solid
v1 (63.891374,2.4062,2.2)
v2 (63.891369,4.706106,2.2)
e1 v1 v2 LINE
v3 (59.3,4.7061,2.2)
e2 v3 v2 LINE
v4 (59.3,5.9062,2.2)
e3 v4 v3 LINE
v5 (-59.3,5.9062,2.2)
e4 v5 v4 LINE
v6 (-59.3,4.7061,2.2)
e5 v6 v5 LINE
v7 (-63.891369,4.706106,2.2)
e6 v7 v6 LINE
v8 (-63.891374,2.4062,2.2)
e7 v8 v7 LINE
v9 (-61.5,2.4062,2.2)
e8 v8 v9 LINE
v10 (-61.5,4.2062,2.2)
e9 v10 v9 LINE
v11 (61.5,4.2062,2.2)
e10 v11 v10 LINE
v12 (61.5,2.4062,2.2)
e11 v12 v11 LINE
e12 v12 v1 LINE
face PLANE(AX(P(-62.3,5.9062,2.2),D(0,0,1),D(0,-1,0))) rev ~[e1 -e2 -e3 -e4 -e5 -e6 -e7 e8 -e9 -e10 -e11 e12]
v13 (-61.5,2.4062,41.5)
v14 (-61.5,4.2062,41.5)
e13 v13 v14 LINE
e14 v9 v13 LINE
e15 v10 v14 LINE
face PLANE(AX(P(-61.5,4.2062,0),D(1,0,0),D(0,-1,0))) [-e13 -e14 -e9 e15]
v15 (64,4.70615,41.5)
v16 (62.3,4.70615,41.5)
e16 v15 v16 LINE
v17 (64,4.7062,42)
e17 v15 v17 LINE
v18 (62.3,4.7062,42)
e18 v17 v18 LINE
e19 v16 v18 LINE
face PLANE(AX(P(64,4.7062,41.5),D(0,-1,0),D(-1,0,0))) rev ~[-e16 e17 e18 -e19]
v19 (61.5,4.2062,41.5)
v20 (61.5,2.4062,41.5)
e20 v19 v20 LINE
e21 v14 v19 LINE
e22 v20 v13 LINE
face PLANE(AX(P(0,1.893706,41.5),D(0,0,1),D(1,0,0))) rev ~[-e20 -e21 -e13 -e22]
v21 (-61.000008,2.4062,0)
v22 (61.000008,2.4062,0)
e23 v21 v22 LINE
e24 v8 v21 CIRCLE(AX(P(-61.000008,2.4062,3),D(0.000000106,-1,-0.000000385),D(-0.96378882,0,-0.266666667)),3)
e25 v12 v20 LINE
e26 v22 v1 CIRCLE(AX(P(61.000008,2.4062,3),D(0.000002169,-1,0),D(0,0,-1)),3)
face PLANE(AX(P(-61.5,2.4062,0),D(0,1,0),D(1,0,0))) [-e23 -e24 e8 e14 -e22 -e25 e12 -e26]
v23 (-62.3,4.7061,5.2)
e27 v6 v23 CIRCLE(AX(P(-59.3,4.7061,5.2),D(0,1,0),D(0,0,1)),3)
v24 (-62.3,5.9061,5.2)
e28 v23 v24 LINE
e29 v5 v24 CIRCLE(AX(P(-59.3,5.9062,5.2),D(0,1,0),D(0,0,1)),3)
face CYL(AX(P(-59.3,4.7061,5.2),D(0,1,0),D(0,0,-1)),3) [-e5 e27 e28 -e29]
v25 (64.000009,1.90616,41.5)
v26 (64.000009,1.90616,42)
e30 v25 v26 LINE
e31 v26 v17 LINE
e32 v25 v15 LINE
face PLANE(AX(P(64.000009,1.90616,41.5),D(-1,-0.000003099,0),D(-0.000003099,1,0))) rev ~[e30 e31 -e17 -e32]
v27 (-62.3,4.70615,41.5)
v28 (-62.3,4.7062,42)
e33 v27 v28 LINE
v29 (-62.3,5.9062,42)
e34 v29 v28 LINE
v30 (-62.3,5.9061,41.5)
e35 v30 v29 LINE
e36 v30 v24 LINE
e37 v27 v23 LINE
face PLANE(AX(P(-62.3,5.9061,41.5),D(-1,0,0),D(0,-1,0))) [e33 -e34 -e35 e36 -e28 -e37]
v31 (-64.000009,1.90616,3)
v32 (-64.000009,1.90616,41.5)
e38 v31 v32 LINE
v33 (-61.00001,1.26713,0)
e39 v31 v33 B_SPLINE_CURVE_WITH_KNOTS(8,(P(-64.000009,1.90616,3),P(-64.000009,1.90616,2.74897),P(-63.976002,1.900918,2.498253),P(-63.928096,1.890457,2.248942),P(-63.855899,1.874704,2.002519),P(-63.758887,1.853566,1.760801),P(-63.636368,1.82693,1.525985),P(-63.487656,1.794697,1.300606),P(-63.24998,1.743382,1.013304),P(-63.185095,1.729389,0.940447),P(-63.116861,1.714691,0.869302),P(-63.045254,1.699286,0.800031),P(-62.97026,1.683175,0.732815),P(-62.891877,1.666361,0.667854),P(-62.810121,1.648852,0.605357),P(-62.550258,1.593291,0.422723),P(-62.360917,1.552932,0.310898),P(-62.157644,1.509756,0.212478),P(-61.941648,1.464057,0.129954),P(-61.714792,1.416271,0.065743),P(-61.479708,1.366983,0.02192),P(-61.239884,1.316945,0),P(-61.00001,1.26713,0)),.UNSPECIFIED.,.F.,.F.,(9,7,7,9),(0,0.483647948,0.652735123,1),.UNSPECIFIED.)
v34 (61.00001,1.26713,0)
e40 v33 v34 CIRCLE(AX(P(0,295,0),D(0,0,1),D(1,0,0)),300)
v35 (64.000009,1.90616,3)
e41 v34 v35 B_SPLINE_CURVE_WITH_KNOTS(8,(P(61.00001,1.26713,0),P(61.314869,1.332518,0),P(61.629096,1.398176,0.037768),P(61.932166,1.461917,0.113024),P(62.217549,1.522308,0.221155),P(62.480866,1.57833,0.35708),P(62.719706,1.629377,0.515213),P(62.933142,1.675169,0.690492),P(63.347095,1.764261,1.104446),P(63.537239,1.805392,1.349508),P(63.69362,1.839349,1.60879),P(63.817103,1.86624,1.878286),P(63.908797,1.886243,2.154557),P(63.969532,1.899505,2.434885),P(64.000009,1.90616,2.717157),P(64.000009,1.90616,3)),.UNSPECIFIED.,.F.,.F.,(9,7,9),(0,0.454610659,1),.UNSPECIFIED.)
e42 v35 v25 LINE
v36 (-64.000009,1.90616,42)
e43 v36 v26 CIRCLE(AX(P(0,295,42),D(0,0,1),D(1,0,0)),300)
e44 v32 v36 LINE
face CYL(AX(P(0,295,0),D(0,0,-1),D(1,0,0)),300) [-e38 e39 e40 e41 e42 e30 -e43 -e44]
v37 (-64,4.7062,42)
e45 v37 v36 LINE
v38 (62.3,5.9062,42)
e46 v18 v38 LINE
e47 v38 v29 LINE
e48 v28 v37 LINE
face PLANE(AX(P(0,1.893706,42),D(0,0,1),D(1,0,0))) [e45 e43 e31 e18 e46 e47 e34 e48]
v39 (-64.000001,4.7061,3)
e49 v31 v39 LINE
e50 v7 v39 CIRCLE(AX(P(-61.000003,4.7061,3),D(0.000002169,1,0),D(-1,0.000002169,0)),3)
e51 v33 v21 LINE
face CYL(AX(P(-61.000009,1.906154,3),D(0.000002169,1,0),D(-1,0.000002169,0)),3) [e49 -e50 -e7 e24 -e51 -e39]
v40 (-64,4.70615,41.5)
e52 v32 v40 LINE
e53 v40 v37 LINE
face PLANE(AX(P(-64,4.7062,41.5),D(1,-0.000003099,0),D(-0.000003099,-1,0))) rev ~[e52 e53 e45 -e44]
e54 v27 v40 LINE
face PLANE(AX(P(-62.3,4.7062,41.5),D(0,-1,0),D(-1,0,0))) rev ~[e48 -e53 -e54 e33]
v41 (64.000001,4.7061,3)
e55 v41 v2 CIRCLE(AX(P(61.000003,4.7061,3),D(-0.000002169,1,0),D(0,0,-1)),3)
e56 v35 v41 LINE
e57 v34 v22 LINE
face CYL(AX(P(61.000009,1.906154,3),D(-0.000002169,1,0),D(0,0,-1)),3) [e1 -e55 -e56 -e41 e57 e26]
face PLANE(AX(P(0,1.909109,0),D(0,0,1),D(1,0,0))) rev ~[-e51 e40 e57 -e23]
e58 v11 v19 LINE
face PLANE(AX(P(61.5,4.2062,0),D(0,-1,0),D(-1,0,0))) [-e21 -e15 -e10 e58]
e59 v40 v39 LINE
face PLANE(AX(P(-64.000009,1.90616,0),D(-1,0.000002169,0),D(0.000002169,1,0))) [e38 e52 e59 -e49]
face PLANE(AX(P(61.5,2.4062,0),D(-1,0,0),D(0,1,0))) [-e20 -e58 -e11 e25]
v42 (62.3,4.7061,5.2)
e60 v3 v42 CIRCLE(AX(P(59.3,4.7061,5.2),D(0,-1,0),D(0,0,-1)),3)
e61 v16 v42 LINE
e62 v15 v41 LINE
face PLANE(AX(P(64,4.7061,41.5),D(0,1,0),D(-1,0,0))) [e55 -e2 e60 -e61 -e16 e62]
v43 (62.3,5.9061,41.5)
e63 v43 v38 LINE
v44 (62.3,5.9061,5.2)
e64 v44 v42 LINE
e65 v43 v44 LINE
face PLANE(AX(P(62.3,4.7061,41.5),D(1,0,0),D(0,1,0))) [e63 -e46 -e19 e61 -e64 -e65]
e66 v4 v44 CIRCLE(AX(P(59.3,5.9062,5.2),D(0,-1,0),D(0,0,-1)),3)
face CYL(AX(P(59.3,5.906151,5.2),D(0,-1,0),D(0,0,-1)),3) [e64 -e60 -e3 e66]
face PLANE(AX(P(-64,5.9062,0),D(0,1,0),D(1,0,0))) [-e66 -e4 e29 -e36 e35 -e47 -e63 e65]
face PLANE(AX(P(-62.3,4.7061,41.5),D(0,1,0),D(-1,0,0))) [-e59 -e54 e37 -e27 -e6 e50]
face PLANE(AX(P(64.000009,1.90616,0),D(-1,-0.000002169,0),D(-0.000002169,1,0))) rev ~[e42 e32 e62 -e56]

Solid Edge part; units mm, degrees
sketch "Sketch1" plane through (0, 0, 0) normal (0, 0, 1) x (1, 0, 0)
  arc A0 (-64, 1.9062) -> (64, 1.9062) centre (0, 295) ccw
  line L0 (64, 1.9062) -> (64, 5.9062)
  line L1 (-64, 5.9062) -> (64, 5.9062)
  line L2 (-64, 1.9062) -> (-64, 5.9062)
extrude "Protrusion1" add sketch "Sketch1" along normal blind 41.5
fillet "Verrundung_1" radius 3 1 edges at (-64, 3.9062, 0)
fillet "Verrundung_2" radius 3 1 edges at (64, 3.9062, 0)
sketch "Sketch2" plane through (0, -1.119, 41.5) normal (0, 0, 1) x (1, 0, 0)
  line L0 (-62.3, 7.0251) -> (-62.3, 5.8251)
  line L1 (-62.3, 5.8251) -> (-64, 5.8251)
  line L2 (-64, 5.8251) -> (-64, 7.0251)
  line L3 (-64, 7.0251) -> (-62.3, 7.0251)
  line L4 (64, 7.0251) -> (64, 5.8251)
  line L5 (64, 5.8251) -> (62.3, 5.8251)
  line L6 (62.3, 5.8251) -> (62.3, 7.0251)
  line L7 (62.3, 7.0251) -> (64, 7.0251)
extrude "Extrusionsausschnitt_1" cut sketch "Sketch2" against normal blind 45
sketch "Sketch3" plane through (0, 0.4531, 0) normal (0, 0, -1) x (1, 0, 0)
  line L0 (-61.5, -1.9531) -> (61.5, -1.9531)
  line L1 (61.5, -1.9531) -> (61.5, -3.7531)
  line L2 (61.5, -3.7531) -> (-61.5, -3.7531)
  line L3 (-61.5, -3.7531) -> (-61.5, -1.9531)
extrude "Extrusionsausschnitt_2" cut sketch "Sketch3" against normal blind 554.4
sketch "Sketch4" plane through (-62.3, 5.3062, 21.6481) normal (-1, 0, 0) x (0, 0, 1)
  line L0 (-21.6481, 0.6) -> (-19.4481, 0.6)
  line L1 (-19.4481, 0.6) -> (-19.4481, -2.9)
  line L2 (-21.6481, -2.9) -> (-19.4481, -2.9)
  line L3 (-21.6481, 0.6) -> (-21.6481, -2.9)
extrude "Extrusionsausschnitt_3" cut sketch "Sketch4" along normal blind 28.8 and the other way blind 145.8
fillet "Verrundung_3" radius 3 2 edges at (-62.3, 5.3062, 2.2) (62.3, 5.3062, 2.2)
sketch "Sketch5" plane through (0, 0.4531, 41.5) normal (0, 0, 1) x (1, 0, 0)
  line L0 (62.3, 5.4531) -> (-62.3, 5.4531)
  line L1 (-62.3, 5.4531) -> (-62.3, 4.2531)
  line L2 (-62.3, 4.2531) -> (-64, 4.2531)
  line L3 (-64, 4.2531) -> (-64, 1.4531)
  arc A0 (-64, 1.4531) -> (64, 1.4531) centre (0, 294.5469) ccw
  line L4 (64, 1.4531) -> (64, 4.2531)
  line L5 (64, 4.2531) -> (62.3, 4.2531)
  line L6 (62.3, 4.2531) -> (62.3, 5.4531)
extrude "Extrusionsausprägung_2" add sketch "Sketch5" along normal blind 0.5
